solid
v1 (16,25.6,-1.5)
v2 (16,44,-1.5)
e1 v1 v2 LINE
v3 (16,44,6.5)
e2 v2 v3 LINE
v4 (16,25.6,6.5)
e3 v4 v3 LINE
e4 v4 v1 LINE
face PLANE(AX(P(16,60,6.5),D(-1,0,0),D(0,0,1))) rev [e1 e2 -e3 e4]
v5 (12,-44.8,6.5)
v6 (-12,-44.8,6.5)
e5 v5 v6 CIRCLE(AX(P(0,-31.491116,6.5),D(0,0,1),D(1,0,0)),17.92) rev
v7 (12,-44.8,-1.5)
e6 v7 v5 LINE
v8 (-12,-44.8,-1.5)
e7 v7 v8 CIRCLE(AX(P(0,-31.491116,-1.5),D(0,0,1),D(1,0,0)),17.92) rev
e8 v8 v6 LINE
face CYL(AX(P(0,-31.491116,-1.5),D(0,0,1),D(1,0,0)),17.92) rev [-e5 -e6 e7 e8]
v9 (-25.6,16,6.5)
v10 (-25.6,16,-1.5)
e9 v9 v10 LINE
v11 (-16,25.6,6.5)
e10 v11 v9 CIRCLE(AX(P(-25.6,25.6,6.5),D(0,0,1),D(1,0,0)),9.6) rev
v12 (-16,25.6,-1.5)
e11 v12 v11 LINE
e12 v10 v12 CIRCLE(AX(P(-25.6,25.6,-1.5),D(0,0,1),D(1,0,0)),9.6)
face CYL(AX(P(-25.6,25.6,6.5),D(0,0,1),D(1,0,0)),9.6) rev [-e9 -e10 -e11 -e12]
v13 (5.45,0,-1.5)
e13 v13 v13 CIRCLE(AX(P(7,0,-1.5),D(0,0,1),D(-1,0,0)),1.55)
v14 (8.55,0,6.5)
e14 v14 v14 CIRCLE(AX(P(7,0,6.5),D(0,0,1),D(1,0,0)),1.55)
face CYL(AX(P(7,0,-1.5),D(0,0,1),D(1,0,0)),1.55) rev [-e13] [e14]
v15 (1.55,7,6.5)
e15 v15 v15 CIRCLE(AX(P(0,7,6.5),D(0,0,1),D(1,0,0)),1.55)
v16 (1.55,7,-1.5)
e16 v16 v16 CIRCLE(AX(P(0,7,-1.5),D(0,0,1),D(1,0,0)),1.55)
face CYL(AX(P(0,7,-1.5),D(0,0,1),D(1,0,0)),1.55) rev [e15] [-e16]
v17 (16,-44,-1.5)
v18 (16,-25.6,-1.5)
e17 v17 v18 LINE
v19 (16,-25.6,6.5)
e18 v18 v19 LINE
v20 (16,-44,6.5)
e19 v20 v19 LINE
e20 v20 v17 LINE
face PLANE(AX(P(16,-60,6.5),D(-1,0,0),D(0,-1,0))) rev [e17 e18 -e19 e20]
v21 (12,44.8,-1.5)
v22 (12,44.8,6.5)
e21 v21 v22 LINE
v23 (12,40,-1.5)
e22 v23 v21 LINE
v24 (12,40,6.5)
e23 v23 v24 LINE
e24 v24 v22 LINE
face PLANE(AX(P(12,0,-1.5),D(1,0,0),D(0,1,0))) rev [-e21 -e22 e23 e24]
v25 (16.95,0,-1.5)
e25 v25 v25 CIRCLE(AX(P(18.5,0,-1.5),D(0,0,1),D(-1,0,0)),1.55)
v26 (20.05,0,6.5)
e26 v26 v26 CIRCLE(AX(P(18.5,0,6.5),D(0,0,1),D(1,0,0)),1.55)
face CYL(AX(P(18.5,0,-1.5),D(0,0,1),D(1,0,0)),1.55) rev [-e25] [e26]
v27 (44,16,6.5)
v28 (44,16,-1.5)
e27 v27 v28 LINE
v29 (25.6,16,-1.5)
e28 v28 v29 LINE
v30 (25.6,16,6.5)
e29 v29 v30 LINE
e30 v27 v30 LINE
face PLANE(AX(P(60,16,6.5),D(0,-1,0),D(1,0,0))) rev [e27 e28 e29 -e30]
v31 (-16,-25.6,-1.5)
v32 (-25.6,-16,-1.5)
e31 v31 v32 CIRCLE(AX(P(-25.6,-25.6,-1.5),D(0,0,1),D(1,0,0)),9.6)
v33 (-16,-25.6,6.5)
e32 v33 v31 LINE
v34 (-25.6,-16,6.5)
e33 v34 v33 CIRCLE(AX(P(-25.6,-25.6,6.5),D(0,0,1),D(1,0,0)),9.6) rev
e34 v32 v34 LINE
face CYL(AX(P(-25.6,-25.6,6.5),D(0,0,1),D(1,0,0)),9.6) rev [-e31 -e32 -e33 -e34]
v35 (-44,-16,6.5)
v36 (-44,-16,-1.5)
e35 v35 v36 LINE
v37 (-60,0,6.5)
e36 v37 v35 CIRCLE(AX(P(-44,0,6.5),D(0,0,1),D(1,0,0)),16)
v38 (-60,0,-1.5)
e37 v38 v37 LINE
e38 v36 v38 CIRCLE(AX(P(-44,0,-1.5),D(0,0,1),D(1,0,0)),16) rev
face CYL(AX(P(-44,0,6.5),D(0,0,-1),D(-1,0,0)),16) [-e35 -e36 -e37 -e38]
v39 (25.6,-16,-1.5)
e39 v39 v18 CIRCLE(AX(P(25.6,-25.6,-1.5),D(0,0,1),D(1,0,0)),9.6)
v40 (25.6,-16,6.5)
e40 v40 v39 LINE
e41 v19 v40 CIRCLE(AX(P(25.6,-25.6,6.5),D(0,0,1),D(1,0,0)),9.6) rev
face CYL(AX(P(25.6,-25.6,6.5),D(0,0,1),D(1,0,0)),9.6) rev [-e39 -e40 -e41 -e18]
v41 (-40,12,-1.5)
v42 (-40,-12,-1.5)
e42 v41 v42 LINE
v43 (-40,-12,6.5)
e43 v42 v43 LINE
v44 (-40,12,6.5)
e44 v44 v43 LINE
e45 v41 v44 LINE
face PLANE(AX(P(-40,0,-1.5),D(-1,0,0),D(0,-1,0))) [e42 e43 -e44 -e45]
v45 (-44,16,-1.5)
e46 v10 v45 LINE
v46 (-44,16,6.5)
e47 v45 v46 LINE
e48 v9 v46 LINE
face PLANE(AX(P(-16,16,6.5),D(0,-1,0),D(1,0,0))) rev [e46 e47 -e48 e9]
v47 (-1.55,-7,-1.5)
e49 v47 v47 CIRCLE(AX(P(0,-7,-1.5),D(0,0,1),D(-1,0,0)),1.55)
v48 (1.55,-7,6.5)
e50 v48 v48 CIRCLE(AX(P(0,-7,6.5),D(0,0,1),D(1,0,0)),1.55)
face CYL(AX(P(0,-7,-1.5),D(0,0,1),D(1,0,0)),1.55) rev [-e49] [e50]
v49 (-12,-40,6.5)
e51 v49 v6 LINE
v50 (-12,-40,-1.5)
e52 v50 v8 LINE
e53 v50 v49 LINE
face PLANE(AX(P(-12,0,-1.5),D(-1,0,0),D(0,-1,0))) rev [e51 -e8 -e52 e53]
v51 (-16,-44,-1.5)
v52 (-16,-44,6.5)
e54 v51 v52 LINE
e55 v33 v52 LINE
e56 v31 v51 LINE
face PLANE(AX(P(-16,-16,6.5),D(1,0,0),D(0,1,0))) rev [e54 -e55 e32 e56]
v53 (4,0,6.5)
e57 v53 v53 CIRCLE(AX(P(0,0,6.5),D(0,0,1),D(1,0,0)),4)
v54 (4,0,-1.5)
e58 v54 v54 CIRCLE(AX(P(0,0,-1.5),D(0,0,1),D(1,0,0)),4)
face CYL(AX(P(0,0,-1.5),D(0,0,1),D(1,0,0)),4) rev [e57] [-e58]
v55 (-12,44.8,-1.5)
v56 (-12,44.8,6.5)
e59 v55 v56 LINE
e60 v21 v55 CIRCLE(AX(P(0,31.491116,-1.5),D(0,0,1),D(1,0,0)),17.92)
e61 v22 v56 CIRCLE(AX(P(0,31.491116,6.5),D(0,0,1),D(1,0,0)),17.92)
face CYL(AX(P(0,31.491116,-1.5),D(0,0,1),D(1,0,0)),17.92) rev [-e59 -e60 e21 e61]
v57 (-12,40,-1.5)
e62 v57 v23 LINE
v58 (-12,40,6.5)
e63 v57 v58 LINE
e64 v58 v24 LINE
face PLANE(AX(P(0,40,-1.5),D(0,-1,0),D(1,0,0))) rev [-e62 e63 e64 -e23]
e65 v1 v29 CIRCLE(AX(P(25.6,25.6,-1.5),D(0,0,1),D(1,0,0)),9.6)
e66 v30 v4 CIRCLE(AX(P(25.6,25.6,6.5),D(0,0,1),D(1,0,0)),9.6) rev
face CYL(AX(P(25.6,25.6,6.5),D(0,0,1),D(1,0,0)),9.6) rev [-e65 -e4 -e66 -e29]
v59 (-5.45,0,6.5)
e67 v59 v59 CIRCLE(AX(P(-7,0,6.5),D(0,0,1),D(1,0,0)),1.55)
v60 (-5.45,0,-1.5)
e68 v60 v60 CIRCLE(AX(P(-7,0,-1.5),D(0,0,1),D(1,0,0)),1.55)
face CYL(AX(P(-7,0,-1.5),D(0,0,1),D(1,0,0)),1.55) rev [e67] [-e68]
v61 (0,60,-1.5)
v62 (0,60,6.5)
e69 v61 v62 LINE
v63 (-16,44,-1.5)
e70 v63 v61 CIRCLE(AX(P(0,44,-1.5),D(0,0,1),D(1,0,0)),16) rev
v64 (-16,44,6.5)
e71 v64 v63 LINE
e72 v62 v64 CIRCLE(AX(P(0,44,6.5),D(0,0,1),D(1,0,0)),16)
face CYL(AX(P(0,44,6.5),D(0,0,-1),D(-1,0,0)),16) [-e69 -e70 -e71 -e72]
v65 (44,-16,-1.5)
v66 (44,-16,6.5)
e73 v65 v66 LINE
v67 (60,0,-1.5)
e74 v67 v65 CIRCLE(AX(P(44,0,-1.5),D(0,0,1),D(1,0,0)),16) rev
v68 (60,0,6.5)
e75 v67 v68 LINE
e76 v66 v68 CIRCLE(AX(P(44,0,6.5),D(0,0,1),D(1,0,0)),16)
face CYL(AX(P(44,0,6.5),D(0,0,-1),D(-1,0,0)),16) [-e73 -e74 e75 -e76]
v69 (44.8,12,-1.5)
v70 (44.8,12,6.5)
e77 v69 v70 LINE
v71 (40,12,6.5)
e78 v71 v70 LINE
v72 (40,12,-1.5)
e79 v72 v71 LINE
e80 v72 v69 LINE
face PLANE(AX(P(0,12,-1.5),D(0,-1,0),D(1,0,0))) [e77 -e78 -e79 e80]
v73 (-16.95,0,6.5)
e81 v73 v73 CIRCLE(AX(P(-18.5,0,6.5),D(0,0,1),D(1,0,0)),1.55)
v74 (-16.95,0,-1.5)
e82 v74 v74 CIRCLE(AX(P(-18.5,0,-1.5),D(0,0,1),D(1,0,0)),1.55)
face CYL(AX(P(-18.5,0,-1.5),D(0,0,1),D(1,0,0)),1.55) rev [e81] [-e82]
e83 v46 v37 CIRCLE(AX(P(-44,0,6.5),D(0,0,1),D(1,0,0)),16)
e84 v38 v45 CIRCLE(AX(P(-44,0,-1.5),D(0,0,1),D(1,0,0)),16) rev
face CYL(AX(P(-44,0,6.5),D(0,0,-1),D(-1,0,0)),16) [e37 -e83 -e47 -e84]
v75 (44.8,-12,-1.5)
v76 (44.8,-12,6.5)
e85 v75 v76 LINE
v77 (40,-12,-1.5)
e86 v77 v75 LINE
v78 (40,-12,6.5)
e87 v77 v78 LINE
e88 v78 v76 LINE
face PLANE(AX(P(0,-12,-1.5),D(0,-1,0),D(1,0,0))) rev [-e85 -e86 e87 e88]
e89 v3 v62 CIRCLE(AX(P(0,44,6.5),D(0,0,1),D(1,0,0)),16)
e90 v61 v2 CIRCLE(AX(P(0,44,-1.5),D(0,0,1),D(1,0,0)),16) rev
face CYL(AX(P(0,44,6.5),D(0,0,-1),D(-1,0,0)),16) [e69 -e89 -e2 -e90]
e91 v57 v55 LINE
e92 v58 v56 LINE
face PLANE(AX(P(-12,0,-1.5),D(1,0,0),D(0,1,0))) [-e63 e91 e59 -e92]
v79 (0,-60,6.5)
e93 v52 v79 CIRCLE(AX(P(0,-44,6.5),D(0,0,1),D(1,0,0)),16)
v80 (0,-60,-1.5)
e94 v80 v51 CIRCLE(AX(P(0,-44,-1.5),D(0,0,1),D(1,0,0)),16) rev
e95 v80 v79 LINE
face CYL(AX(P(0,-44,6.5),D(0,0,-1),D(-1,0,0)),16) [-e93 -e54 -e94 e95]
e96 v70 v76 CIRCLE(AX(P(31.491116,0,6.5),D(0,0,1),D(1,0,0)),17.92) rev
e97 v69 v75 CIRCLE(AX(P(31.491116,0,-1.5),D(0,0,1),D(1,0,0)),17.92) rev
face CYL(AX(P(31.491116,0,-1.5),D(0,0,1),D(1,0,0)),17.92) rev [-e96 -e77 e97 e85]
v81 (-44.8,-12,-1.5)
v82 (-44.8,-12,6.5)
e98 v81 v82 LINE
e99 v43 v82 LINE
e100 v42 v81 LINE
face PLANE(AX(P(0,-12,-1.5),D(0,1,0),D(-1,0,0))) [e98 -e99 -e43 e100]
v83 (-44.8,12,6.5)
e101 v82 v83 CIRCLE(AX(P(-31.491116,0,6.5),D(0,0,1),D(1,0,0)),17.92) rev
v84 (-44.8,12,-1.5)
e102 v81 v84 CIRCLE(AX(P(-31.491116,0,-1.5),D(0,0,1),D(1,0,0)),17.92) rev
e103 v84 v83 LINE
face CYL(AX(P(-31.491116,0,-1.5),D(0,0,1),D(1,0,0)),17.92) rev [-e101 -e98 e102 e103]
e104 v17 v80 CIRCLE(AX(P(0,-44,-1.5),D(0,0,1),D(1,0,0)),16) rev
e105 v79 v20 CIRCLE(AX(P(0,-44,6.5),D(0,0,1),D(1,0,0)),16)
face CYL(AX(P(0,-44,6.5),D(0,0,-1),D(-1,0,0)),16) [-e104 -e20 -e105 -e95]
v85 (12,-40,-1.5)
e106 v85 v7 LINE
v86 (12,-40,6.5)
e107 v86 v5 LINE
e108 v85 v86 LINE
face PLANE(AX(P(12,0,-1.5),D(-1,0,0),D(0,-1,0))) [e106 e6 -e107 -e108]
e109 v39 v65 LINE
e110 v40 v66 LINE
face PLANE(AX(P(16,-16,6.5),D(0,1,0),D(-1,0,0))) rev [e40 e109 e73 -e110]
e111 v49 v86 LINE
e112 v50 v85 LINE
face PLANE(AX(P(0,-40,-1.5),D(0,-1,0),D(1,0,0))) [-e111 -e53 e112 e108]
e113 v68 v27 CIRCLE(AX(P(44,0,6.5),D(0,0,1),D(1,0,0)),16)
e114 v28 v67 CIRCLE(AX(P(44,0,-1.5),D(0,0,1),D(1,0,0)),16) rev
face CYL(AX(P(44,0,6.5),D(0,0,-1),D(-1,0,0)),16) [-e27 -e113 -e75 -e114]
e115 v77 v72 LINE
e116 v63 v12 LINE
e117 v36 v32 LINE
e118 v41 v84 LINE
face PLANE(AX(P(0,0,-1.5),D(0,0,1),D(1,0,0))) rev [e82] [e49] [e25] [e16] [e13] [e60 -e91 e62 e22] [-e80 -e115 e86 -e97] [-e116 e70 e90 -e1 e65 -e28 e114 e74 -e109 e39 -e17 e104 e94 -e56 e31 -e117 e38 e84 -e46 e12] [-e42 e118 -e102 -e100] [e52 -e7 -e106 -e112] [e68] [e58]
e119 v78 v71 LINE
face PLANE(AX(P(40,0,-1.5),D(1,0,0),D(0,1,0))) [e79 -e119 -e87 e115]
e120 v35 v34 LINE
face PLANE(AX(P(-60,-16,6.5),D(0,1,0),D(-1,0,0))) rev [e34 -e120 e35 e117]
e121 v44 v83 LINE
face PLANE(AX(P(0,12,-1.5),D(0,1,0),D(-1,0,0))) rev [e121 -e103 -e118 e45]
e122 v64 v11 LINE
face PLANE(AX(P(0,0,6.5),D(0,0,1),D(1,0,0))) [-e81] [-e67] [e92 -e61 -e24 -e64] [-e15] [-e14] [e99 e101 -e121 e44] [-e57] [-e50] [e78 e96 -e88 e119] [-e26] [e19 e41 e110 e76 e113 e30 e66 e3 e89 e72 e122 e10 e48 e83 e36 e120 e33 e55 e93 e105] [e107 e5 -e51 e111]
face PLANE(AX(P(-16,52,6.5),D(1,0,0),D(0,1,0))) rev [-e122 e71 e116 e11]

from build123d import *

# Parameters (mm, degrees)
EXTRUDE_1_DEPTH          = 5
CUT_EXTRUDE_1_DEPTH      = 54.268189382
FILLET_1_R               = 10
FILLET_2_R               = 6
SCALE_1_SCALE            = 1.6
CUT_EXTRUDE_2_DEPTH      = 86.229103011
CUT_EXTRUDE_2_DEPTH_BACK = 86.229103011
SKETCH_3_R               = 4
SKETCH_3_R_2             = 1.55


with BuildPart() as part:
    # 草图1 → 凸台-拉伸1 (new body)
    with BuildSketch(Plane.XY):
        Polygon((-10, 32.5), (-10, 10), (-37.5, 10), (-37.5, -10), (-10, -10), (-10, -37.5), (10, -37.5), (10, -10), (37.5, -10), (37.5, 10), (10, 10), (10, 32.5), (10, 37.5), (0, 37.5), (-10, 37.5), align=None)
    extrude(amount=EXTRUDE_1_DEPTH)

    # 草图2 → 切除-拉伸1 (cut, through all)
    with BuildSketch(Plane.XY.offset(5)):
        with BuildLine():
            Line((7.5, 25), (7.5, 28))
            ThreePointArc((7.5, 28), (0, 30.881947343), (-7.5, 28))
            Line((-7.5, 28), (-7.5, 25))
            Line((-7.5, 25), (7.5, 25))
        make_face()
        with BuildLine():
            ThreePointArc((-28, -7.5), (-30.881947343, 0), (-28, 7.5))
            Line((-28, 7.5), (-25, 7.5))
            Line((-25, 7.5), (-25, -7.5))
            Line((-25, -7.5), (-28, -7.5))
        make_face()
        with BuildLine():
            ThreePointArc((7.5, -28), (0, -30.881947343), (-7.5, -28))
            Line((-7.5, -28), (-7.5, -25))
            Line((-7.5, -25), (7.5, -25))
            Line((7.5, -25), (7.5, -28))
        make_face()
        with BuildLine():
            ThreePointArc((28, 7.5), (30.881947343, 0), (28, -7.5))
            Line((28, -7.5), (25, -7.5))
            Line((25, -7.5), (25, 7.5))
            Line((25, 7.5), (28, 7.5))
        make_face()
    extrude(amount=-CUT_EXTRUDE_1_DEPTH, mode=Mode.SUBTRACT)

    # 圆角1
    fillet_1_edges = [part.edges().sort_by_distance(p)[0] for p in [
        (-37.5, 10, 2.5),
        (-37.5, -10, 2.5),
        (-10, -37.5, 2.5),
        (10, -37.5, 2.5),
        (37.5, -10, 2.5),
        (37.5, 10, 2.5),
        (10, 37.5, 2.5),
        (-10, 37.5, 2.5),
    ]]
    fillet(fillet_1_edges, radius=FILLET_1_R - 0.0001)  # a hair under: the kernel refuses the full size

    # 圆角2
    fillet_2_edges = [part.edges().sort_by_distance(p)[0] for p in [
        (10, 10, 2.5),
        (10, -10, 2.5),
        (-10, -10, 2.5),
        (-10, 10, 2.5),
    ]]
    fillet(fillet_2_edges, radius=FILLET_2_R)


with BuildPart() as part_1:
    # 缩放比例1: scaled about (0, 0, 2.5)
    add(part.part.scale(SCALE_1_SCALE).moved(Location((0, 0, -1.5))))

    # 草图3 → 切除-拉伸2 (cut, two sides: drawn at the far end of the back side and taken through both)
    with BuildSketch(Plane.XY.offset(6.5).offset(-CUT_EXTRUDE_2_DEPTH_BACK)):
        Circle(SKETCH_3_R)
        with Locations((-7, 0)):
            Circle(SKETCH_3_R_2)
        with Locations((7, 0)):
            Circle(SKETCH_3_R_2)
        with Locations((0, 7)):
            Circle(SKETCH_3_R_2)
        with Locations((0, -7)):
            Circle(SKETCH_3_R_2)
        with Locations((-18.5, 0)):
            Circle(SKETCH_3_R_2)
        with Locations((18.5, 0)):
            Circle(SKETCH_3_R_2)
    extrude(amount=CUT_EXTRUDE_2_DEPTH + CUT_EXTRUDE_2_DEPTH_BACK, mode=Mode.SUBTRACT)


solid = part_1.part
